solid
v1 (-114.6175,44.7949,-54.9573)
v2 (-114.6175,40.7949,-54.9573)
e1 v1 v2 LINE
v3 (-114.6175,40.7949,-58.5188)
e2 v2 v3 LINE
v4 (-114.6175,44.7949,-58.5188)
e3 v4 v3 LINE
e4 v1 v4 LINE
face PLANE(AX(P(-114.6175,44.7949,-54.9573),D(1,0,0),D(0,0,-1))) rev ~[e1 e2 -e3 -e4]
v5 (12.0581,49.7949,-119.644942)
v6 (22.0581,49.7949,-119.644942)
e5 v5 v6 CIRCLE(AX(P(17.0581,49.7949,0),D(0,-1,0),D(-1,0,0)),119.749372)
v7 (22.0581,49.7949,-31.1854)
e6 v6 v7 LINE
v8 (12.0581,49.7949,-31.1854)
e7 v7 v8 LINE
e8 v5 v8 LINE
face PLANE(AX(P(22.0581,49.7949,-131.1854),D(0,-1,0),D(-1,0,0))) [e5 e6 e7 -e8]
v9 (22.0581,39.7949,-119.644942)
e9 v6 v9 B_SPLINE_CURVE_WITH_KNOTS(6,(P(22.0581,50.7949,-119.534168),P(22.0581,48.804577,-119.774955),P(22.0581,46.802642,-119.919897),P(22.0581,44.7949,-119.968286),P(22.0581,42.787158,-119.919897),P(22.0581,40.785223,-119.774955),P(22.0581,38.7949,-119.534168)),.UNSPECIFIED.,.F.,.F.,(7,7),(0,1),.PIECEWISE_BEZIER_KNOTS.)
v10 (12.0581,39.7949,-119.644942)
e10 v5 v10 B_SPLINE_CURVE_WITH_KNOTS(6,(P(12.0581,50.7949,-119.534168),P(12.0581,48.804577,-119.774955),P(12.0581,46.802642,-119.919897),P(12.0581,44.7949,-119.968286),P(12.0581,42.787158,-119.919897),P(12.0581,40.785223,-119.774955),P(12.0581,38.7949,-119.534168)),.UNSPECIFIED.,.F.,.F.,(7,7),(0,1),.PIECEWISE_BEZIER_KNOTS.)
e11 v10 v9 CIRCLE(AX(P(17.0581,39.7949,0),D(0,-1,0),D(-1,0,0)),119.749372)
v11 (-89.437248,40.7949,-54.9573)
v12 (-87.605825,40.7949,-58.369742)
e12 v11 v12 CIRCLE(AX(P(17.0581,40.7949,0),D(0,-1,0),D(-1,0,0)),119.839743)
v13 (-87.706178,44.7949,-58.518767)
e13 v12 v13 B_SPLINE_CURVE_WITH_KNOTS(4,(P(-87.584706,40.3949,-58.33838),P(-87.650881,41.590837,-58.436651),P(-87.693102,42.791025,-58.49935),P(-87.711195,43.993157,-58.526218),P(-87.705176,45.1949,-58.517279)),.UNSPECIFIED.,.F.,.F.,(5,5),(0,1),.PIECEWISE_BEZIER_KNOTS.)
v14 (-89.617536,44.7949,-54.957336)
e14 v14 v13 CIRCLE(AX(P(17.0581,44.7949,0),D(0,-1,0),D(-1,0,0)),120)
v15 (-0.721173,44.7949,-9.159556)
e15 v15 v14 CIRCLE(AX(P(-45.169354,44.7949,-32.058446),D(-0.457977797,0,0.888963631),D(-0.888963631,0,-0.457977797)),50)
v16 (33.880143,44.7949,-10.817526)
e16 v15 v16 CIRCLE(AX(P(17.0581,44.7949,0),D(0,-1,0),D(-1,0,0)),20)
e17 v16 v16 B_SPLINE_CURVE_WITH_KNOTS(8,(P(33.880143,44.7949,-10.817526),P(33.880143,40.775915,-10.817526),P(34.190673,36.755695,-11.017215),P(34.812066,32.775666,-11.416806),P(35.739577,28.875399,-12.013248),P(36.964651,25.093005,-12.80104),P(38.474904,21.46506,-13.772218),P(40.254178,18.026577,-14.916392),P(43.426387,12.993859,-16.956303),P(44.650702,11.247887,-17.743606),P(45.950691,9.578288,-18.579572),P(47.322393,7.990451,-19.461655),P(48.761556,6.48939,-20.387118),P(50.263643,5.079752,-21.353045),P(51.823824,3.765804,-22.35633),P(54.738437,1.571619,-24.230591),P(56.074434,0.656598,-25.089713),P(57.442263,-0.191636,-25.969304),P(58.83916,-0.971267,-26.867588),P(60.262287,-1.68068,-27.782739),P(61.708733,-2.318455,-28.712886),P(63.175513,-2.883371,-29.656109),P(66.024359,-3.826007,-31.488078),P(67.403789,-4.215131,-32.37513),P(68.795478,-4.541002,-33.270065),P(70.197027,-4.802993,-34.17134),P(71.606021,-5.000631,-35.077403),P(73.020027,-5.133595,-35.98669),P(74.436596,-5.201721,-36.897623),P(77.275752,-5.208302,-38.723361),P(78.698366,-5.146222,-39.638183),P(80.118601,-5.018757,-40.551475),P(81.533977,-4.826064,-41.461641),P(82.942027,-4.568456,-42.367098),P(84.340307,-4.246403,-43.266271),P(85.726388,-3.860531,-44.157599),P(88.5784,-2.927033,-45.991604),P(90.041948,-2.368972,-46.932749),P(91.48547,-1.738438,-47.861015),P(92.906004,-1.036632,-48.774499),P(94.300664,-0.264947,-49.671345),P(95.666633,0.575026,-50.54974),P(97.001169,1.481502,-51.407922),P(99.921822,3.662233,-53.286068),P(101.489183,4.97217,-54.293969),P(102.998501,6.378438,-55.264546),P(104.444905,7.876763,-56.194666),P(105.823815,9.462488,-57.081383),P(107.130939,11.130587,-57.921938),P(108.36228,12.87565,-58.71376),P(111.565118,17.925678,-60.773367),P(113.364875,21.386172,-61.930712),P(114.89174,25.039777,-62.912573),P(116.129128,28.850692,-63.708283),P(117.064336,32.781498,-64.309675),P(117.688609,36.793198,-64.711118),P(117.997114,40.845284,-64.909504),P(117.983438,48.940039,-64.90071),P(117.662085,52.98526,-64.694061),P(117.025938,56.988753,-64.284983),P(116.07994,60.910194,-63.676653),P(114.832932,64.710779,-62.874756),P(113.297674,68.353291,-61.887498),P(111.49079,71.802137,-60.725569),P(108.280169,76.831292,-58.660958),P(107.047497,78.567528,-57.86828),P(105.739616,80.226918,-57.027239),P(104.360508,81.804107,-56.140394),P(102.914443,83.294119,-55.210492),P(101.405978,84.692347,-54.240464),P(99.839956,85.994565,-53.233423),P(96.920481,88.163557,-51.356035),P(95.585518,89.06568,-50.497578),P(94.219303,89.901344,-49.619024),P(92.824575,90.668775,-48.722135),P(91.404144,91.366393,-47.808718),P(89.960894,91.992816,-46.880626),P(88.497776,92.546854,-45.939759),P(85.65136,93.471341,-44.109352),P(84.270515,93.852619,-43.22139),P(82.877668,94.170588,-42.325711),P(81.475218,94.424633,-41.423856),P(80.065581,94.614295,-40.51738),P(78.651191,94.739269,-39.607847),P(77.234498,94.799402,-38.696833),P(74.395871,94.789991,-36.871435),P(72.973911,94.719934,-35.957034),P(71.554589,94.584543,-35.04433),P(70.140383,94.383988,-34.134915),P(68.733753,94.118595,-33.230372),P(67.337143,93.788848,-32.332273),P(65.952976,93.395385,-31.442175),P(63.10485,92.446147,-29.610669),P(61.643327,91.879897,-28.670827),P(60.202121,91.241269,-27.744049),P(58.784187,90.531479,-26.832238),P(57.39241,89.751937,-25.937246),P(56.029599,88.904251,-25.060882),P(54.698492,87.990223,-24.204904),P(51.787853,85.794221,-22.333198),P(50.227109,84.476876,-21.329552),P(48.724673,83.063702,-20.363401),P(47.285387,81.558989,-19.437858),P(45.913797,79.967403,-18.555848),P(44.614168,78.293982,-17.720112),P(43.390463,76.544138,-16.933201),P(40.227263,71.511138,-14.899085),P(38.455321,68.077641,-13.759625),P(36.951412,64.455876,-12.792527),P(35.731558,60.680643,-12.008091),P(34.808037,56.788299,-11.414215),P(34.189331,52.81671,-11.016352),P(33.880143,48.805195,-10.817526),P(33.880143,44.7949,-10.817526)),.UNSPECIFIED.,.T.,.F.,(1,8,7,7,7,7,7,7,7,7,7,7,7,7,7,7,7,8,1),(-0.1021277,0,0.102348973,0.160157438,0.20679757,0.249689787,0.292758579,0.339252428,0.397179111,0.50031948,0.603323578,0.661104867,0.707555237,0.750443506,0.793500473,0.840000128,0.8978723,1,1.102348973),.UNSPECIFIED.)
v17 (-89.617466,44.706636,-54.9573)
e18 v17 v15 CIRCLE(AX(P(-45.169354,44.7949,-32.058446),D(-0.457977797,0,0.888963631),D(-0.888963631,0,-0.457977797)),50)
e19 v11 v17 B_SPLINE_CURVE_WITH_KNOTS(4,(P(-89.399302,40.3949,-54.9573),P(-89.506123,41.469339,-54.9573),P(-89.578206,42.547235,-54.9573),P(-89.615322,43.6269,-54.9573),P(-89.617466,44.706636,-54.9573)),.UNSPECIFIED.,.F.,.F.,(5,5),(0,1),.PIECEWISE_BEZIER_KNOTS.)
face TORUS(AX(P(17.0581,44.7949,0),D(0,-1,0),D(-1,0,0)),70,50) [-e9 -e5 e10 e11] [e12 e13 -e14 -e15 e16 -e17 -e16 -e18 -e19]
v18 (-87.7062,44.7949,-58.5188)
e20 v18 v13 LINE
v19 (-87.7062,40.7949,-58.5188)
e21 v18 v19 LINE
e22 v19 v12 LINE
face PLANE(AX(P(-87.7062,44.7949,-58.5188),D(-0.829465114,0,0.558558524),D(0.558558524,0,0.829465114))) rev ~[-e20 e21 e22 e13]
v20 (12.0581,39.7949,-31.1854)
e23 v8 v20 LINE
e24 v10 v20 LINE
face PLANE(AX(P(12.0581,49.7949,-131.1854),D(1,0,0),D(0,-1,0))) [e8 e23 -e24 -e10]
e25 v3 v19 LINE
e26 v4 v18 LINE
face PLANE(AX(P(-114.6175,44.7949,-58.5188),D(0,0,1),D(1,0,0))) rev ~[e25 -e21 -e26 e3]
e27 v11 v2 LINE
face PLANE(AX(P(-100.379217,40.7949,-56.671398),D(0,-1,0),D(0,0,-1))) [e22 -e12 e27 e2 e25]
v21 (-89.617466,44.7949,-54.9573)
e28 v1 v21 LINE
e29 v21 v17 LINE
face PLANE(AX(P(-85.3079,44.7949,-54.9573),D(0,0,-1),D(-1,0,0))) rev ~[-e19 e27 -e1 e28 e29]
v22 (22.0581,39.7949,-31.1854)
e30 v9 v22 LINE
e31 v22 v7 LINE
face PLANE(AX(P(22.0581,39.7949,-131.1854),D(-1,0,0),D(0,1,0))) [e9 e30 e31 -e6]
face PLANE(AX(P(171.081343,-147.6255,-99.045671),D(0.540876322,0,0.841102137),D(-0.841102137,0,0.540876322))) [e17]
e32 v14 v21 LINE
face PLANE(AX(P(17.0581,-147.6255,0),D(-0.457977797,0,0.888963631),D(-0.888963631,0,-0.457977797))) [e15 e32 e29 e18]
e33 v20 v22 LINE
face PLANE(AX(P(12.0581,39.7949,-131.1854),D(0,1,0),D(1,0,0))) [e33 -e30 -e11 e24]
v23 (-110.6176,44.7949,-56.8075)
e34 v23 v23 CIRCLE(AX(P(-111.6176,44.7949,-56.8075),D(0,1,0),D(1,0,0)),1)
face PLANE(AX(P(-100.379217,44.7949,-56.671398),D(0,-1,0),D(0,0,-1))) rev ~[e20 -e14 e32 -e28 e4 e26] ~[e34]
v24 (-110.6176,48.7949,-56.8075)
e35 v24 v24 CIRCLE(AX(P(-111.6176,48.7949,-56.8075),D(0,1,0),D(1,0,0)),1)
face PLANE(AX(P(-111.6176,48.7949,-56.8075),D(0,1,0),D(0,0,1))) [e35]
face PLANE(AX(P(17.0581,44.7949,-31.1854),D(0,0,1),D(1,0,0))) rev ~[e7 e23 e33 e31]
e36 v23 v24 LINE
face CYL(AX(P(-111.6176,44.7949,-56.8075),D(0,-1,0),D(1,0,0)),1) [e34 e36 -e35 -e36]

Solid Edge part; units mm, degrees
sketch "Sketch1" plane through (0, 0, 0) normal (0, 0, 1) x (1, 0, 0)
  circle A0 centre (-52.9419, 44.7949) radius 50
  dimension "D1" = 100
  dimension "D2" = 70
revolve "RevolvedProtrusion1" add sketch "Sketch1" angle 360 about axis through (17.0581, 73.3637, 0) along (0, -1, 0)
sketch "Sketch2" plane through (0, -147.6255, 0) normal (0, -1, 0) x (1, 0, 0)
  line L0 (17.0581, 0) -> (-138.6485, -80.2172)
  arc A0 (-138.6485, -80.2172) -> (171.0814, -99.0457) centre (20.3737, -21.2433) cw
  line L1 (171.0814, -99.0457) -> (17.0581, 0)
extrude "Cutout1" cut sketch "Sketch2" against normal through all
sketch "Sketch3" plane through (0, 0, -131.1854) normal (0, 0, 1) x (1, 0, 0)
  line L0 (12.0581, 39.7949) -> (22.0581, 39.7949)
  line L1 (22.0581, 39.7949) -> (22.0581, 49.7949)
  line L2 (22.0581, 49.7949) -> (12.0581, 49.7949)
  line L3 (12.0581, 49.7949) -> (12.0581, 39.7949)
  dimension "D1" = 10
  dimension "D2" = 10
  dimension "D3" = 45
extrude "ExtrudedCutout_5" cut sketch "Sketch3" along normal blind 100
sketch "Sketch4" plane through (0, 44.7949, 0) normal (0, -1, 0) x (1, 0, 0)
  line L0 (-89.6175, -54.9573) -> (-114.6175, -54.9573)
  line L1 (-114.6175, -54.9573) -> (-114.6175, -58.5188)
  line L2 (-114.6175, -58.5188) -> (-87.7062, -58.5188)
  line L3 (-87.7062, -58.5188) -> (-85.3079, -54.9573)
  line L4 (-85.3079, -54.9573) -> (-89.6175, -54.9573)
  dimension "D1" = 25
extrude "ExtrudedProtrusion_1" add sketch "Sketch4" along normal blind 4
sketch "Sketch5" plane through (-102.0974, 44.7949, -56.7381) normal (0, 1, 0) x (1, 0, 0)
  circle A0 centre (-9.5202, 0.0694) radius 1
  dimension "D1" = 3
extrude "ExtrudedProtrusion_2" add sketch "Sketch5" along normal blind 4
